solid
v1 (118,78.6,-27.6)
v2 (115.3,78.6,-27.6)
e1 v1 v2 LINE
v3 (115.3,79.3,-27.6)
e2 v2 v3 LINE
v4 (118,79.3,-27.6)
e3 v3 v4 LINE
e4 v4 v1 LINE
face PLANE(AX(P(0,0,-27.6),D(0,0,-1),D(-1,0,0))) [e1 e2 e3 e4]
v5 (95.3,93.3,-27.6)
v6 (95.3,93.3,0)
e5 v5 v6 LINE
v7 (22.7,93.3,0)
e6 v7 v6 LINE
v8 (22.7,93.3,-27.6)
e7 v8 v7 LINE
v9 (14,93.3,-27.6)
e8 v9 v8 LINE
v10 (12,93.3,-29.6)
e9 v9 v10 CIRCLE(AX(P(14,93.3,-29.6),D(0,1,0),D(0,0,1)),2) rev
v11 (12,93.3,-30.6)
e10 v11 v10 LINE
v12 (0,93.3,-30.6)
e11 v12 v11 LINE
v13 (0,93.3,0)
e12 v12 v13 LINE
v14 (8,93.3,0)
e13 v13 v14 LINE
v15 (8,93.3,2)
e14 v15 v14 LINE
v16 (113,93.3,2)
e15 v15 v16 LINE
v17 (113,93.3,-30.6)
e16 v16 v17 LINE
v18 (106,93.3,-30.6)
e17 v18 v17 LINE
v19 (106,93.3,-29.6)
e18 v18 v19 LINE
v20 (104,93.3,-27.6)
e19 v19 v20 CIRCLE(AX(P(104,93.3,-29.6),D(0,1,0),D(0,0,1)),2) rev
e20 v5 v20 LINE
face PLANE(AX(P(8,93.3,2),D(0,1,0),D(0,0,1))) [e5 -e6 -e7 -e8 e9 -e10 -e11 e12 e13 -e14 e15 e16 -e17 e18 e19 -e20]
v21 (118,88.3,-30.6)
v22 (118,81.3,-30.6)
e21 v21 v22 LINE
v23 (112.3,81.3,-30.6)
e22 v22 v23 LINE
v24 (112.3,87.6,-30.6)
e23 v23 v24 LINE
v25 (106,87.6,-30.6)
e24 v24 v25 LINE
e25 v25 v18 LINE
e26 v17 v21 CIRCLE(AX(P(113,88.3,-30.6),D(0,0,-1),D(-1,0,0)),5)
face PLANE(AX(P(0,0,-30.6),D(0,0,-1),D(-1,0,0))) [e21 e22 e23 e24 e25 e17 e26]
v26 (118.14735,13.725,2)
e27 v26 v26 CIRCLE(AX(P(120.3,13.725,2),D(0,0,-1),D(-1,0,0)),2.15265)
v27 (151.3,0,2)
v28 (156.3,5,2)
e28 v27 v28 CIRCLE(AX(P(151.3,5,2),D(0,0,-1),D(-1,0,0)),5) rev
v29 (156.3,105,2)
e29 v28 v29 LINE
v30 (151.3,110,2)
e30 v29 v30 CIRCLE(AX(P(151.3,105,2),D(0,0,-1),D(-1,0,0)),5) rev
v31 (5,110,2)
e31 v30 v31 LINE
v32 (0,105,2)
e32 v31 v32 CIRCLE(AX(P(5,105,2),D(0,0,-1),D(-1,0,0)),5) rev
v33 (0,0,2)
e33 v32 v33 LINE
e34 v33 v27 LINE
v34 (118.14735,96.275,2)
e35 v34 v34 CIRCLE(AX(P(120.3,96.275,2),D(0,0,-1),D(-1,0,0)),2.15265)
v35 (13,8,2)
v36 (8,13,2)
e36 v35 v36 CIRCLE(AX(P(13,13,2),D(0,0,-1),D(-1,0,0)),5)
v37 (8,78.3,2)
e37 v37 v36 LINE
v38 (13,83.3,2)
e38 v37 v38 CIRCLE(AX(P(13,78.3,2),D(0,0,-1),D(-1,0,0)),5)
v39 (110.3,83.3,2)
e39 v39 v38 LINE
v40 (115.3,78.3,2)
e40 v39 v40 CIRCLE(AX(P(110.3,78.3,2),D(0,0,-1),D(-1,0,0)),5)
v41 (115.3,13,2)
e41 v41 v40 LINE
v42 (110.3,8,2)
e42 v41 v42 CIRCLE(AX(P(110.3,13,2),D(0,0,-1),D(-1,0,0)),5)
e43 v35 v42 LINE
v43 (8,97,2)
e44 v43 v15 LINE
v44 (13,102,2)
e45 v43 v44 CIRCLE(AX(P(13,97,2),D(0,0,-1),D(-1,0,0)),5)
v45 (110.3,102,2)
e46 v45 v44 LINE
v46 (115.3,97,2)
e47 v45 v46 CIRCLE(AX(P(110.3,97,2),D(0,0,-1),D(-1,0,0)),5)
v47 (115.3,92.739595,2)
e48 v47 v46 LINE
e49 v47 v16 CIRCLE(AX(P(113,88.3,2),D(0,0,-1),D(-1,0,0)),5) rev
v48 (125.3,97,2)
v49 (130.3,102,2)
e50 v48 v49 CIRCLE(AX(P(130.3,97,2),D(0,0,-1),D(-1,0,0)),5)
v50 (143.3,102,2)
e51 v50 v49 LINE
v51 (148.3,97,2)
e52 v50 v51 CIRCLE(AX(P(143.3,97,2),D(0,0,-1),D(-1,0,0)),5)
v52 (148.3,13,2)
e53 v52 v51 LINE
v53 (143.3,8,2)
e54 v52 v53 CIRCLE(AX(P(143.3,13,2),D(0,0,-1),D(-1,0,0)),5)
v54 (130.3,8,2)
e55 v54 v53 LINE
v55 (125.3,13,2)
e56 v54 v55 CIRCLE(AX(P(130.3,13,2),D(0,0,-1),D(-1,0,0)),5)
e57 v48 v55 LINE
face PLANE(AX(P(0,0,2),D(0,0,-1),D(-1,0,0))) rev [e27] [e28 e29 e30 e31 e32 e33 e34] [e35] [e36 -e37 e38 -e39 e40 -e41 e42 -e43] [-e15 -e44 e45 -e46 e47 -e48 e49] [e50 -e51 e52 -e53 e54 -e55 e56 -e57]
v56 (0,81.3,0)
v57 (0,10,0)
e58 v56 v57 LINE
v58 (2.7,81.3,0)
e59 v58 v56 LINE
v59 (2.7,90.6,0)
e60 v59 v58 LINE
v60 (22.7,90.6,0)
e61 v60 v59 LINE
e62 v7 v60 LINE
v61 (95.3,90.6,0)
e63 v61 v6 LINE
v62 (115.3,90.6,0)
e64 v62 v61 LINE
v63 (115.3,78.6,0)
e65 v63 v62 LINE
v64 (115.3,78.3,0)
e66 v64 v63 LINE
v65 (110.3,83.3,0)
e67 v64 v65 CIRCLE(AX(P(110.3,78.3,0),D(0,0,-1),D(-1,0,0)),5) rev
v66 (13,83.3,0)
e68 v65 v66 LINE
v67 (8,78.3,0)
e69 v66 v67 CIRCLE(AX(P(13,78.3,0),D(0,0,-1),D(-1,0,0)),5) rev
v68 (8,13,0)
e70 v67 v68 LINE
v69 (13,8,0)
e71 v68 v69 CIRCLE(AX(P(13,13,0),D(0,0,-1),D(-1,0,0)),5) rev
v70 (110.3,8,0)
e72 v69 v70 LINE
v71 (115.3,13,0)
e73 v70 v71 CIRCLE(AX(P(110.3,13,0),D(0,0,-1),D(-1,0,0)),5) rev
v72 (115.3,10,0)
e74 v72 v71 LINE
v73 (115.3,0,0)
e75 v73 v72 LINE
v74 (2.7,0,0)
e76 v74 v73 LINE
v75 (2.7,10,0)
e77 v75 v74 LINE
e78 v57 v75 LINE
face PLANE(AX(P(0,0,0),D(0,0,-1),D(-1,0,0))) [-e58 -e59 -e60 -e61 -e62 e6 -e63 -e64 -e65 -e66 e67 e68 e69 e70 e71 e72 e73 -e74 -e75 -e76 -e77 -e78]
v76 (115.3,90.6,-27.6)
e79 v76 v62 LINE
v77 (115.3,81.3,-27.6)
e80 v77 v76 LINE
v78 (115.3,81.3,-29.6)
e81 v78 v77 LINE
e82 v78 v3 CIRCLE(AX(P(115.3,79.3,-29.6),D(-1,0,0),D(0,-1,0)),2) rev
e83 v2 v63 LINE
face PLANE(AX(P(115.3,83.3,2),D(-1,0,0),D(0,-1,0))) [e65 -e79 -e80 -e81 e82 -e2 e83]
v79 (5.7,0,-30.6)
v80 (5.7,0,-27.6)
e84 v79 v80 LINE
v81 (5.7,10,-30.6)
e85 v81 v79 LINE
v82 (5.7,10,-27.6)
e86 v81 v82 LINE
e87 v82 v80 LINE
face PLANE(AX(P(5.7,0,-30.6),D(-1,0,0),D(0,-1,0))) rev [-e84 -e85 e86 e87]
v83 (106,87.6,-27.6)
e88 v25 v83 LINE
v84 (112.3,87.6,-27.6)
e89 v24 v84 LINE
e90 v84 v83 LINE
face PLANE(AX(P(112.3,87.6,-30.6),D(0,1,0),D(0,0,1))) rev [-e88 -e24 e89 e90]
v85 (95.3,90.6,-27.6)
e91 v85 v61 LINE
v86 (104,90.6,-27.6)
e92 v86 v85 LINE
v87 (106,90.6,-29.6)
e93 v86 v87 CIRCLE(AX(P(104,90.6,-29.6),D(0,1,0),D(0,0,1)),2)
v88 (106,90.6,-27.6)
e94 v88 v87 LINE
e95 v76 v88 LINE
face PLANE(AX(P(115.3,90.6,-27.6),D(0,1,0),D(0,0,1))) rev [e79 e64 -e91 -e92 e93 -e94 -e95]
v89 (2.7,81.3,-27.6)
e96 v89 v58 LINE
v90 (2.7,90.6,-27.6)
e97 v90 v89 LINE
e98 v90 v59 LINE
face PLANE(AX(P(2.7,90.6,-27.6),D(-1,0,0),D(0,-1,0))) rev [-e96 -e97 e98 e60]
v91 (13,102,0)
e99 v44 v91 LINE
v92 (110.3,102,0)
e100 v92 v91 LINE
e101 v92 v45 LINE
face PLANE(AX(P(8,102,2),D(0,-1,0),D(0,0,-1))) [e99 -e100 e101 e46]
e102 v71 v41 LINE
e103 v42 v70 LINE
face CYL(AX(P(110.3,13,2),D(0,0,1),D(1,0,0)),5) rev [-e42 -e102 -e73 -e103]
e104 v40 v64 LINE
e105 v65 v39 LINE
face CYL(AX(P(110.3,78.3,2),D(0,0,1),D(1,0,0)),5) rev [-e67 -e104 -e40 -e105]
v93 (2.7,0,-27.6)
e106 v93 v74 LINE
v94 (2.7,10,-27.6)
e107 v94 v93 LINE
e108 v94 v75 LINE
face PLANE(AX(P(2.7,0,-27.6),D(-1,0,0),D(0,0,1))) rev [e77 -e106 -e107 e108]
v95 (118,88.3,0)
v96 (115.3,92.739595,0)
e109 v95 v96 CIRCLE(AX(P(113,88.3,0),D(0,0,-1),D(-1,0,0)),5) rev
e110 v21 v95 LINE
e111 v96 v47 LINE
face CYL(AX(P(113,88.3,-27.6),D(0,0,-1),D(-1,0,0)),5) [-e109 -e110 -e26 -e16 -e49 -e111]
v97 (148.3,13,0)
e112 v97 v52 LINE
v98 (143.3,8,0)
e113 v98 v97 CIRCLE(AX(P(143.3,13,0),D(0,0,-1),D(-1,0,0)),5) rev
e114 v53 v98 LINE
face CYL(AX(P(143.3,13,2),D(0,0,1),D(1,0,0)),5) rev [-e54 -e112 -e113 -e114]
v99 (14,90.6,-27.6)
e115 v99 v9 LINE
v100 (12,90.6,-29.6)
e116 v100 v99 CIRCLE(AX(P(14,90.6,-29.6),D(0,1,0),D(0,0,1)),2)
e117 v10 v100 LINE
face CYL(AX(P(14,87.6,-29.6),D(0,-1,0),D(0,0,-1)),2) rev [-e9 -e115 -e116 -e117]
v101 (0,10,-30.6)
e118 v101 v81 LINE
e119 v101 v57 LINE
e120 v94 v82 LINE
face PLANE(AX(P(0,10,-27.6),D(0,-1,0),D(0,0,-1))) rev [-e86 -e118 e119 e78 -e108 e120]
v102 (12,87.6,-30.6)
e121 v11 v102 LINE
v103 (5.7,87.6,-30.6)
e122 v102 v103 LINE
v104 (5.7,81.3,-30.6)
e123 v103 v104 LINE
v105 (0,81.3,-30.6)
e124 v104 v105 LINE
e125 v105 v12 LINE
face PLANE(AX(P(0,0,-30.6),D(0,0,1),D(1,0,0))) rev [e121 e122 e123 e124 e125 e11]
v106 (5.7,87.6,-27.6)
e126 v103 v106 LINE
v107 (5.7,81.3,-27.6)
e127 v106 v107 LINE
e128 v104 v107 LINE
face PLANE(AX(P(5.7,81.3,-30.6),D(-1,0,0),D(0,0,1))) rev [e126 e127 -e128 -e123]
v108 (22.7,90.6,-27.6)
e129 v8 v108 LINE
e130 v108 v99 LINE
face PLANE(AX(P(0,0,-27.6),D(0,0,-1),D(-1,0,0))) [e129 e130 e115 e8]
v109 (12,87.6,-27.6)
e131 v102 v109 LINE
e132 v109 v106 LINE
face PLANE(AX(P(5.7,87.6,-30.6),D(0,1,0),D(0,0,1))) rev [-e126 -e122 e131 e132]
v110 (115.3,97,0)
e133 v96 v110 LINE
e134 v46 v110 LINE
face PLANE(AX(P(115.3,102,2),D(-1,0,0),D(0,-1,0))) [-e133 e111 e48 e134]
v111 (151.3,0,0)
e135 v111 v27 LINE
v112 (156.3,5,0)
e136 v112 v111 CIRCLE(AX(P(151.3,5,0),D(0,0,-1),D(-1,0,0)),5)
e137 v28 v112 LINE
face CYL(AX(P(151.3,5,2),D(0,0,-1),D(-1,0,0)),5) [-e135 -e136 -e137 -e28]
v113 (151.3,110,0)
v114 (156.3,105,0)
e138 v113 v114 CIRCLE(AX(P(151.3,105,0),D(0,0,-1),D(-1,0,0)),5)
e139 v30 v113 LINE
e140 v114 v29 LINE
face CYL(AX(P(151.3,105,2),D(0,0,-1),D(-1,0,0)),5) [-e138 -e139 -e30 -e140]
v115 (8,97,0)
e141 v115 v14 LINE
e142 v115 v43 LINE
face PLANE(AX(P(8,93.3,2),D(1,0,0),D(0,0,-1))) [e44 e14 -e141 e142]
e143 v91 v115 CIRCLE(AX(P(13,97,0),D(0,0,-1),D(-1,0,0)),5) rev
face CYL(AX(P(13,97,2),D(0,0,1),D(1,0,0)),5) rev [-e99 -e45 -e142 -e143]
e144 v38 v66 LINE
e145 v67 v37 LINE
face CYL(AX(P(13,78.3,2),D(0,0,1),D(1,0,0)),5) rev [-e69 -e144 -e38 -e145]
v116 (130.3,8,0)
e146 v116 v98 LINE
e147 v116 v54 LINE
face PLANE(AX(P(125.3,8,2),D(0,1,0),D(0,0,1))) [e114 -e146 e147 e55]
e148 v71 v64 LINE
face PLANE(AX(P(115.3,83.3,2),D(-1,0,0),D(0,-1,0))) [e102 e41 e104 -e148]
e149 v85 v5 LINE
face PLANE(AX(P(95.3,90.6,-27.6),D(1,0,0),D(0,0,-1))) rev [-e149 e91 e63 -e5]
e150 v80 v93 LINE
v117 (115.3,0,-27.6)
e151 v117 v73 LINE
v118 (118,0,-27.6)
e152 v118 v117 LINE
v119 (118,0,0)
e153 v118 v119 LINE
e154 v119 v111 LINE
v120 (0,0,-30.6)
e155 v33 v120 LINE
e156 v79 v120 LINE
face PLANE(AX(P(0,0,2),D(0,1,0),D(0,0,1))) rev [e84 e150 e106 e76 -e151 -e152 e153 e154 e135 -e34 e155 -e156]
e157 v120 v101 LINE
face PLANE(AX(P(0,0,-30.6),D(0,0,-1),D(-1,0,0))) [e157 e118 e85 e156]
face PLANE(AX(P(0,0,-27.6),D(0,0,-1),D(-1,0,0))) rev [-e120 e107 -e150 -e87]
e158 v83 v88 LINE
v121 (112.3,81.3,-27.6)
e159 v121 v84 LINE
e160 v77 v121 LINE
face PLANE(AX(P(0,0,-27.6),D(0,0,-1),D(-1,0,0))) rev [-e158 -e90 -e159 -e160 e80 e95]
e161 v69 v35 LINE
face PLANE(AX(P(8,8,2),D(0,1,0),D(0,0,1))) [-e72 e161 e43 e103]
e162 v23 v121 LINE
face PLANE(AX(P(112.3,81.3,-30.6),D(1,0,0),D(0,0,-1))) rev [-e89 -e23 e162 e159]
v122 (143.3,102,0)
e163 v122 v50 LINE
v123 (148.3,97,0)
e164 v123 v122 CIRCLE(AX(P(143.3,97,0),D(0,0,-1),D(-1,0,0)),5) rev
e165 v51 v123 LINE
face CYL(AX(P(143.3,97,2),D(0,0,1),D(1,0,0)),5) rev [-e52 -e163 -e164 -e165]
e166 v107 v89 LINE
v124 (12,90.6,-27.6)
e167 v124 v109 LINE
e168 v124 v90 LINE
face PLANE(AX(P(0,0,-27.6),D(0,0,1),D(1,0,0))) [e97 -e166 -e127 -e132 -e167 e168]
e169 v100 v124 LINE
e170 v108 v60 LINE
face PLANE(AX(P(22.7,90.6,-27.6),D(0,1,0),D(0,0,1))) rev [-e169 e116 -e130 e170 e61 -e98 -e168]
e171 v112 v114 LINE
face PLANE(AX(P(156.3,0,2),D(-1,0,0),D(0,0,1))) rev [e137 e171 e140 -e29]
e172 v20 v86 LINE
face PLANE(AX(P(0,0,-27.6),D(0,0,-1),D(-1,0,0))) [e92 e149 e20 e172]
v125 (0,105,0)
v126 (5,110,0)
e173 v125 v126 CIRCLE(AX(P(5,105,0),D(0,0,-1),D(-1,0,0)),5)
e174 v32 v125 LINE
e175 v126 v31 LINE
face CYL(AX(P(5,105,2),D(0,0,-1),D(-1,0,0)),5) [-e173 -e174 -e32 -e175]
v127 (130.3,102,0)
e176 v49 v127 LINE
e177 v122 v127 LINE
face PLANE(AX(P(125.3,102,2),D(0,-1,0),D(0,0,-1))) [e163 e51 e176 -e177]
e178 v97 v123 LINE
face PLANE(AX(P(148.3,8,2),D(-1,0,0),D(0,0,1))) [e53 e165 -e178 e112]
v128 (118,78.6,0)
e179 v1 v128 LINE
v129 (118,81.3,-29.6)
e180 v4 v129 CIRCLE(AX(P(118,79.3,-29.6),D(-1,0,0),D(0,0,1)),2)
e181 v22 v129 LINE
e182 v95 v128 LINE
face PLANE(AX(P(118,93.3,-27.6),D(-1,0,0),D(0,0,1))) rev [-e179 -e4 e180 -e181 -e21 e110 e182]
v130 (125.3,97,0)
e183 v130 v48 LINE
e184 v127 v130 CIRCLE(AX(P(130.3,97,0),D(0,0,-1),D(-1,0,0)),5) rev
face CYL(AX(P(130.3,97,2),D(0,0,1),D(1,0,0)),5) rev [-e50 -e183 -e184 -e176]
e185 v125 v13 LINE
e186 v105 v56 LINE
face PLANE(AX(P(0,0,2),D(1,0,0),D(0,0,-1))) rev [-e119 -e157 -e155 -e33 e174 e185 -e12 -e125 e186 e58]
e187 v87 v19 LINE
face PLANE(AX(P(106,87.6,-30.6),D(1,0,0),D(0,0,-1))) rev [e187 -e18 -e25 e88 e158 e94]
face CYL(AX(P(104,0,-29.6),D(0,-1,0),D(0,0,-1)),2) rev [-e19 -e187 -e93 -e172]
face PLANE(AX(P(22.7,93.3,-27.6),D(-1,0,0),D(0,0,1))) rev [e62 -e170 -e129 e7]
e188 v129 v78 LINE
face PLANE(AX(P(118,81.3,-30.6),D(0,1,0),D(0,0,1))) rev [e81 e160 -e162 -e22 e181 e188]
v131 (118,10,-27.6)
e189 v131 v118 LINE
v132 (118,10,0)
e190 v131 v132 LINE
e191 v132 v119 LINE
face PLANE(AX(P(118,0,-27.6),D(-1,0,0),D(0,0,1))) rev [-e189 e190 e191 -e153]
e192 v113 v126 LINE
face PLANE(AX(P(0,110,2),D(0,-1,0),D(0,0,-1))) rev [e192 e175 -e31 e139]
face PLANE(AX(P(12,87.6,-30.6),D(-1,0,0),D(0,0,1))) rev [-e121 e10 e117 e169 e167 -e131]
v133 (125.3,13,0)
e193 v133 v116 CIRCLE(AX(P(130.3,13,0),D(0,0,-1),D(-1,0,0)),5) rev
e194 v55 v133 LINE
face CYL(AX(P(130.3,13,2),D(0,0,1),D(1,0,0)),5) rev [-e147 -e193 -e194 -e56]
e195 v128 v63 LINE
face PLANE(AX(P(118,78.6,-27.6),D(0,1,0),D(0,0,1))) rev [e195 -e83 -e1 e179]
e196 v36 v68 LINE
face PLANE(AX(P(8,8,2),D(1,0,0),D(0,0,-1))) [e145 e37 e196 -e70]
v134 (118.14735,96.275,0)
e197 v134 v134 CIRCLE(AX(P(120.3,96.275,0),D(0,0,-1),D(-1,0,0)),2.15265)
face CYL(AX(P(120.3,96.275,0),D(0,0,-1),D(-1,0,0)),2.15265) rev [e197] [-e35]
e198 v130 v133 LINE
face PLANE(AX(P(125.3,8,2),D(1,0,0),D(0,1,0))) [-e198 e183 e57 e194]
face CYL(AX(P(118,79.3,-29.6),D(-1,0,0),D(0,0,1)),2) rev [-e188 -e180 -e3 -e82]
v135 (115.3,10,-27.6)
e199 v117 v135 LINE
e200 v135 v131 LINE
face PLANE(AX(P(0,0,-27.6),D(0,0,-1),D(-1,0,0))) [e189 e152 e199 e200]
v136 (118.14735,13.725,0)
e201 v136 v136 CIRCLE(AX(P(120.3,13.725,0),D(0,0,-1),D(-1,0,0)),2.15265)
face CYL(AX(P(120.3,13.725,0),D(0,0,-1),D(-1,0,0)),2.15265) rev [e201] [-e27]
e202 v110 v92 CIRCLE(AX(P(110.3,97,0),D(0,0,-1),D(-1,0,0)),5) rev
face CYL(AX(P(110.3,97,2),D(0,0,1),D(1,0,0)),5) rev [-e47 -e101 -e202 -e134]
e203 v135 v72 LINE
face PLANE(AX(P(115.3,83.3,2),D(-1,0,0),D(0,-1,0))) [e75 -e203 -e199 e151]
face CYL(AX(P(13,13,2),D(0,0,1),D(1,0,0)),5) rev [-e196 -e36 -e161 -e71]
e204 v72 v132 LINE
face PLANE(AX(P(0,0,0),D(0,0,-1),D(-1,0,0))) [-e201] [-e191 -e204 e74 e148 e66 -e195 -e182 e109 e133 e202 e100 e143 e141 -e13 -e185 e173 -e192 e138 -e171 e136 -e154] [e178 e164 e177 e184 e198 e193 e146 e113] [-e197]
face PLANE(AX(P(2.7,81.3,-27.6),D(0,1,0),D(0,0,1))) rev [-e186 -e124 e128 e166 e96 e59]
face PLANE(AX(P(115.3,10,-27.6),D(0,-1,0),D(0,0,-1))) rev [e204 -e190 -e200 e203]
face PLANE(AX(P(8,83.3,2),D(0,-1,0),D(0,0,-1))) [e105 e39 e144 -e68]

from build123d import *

# Parameters (mm, degrees)
SKETCH1_W             = 156.3
SKETCH1_H             = 110
SKETCH1_W_2           = 107.3
SKETCH1_H_2           = 75.3
SKETCH1_H_3           = 8.7
SKETCH1_W_3           = 23
SKETCH1_H_4           = 94
BOSS_EXTRUDE1_DEPTH   = 2
F_6_CLEARANCE_HOLE1_D = 4.3053
SKETCH6_W             = 2.7
SKETCH6_H             = 10
BOSS_EXTRUDE2_DEPTH   = 27.6
SKETCH7_W             = 5.7
SKETCH7_H             = 10
BOSS_EXTRUDE3_DEPTH   = 3
FILLET3_R             = 5
FILLET4_R             = 2
FILLET5_R             = 5


with BuildPart() as part:
    # Sketch1 → Boss-Extrude1 (new body)
    with BuildSketch(Plane.XY):
        with Locations((78.15, 55)):
            Rectangle(SKETCH1_W, SKETCH1_H)
        with Locations((61.65, 45.65)):
            Rectangle(SKETCH1_W_2, SKETCH1_H_2, mode=Mode.SUBTRACT)
        with Locations((61.65, 97.65)):
            Rectangle(SKETCH1_W_2, SKETCH1_H_3, mode=Mode.SUBTRACT)
        with Locations((136.8, 55)):
            Rectangle(SKETCH1_W_3, SKETCH1_H_4, mode=Mode.SUBTRACT)
    extrude(amount=BOSS_EXTRUDE1_DEPTH)

    # #6 Clearance Hole1 (through all)
    with Locations(Plane(origin=(0, 0, 0), x_dir=(-1, 0, 0), z_dir=(0, 0, -1))):
        with Locations((-120.3, 13.725), (-120.3, 96.275)):
            Hole(F_6_CLEARANCE_HOLE1_D / 2)

    # Sketch6 → Boss-Extrude2 (add)
    with BuildSketch(Plane(origin=(0, 0, 0), x_dir=(-1, 0, 0), z_dir=(0, 0, -1))):
        with Locations((-1.35, 5)):
            Rectangle(SKETCH6_W, SKETCH6_H)
        with Locations((-116.65, 5)):
            Rectangle(SKETCH6_W, SKETCH6_H)
        Polygon((0, 81.3), (0, 93.3), (-22.7, 93.3), (-22.7, 90.6), (-2.7, 90.6), (-2.7, 81.3), align=None)
        Polygon((-95.3, 93.3), (-118, 93.3), (-118, 78.6), (-115.3, 78.6), (-115.3, 90.6), (-95.3, 90.6), align=None)
    extrude(amount=BOSS_EXTRUDE2_DEPTH)

    # Sketch7 → Boss-Extrude3 (add)
    with BuildSketch(Plane(origin=(0, 0, -27.6), x_dir=(-1, 0, 0), z_dir=(0, 0, -1))):
        Polygon((0, 93.3), (0, 81.3), (-5.7, 81.3), (-5.7, 87.6), (-12, 87.6), (-12, 93.3), align=None)
        with Locations((-2.85, 5)):
            Rectangle(SKETCH7_W, SKETCH7_H)
        Polygon((-118, 93.3), (-118, 81.3), (-112.3, 81.3), (-112.3, 87.6), (-106, 87.6), (-106, 93.3), align=None)
    extrude(amount=BOSS_EXTRUDE3_DEPTH)

    # Fillet3
    fillet3_edges = [part.edges().sort_by_distance(p)[0] for p in [
        (118, 93.3, -15.3),
    ]]
    fillet(fillet3_edges, radius=FILLET3_R)

    # Fillet4
    fillet4_edges = [part.edges().sort_by_distance(p)[0] for p in [
        (12, 91.95, -27.6),
        (106, 91.95, -27.6),
        (116.65, 81.3, -27.6),
    ]]
    fillet(fillet4_edges, radius=FILLET4_R)

    # Fillet5
    # the kernel refuses this fillet: 5 mm, written as the material it adds along each edge
    with BuildSketch(Plane(origin=(8, 83.3, 0), x_dir=(1, 0, 0), z_dir=(0, 0, 1)), Plane(origin=(115.3, 83.3, 0), x_dir=(0, -1, 0), z_dir=(0, 0, 1)), Plane(origin=(148.3, 102, 0), x_dir=(0, -1, 0), z_dir=(0, 0, 1)), Plane(origin=(148.3, 8, 0), x_dir=(-1, 0, 0), z_dir=(0, 0, 1)), Plane(origin=(8, 102, 0), x_dir=(1, 0, 0), z_dir=(0, 0, 1)), Plane(origin=(115.3, 102, 0), x_dir=(0, -1, 0), z_dir=(0, 0, 1))) as fillet5_piece_1:
        with BuildLine():
            CenterArc((FILLET5_R, -FILLET5_R), FILLET5_R, 90, 90)
            Line((0, -FILLET5_R), (0, 0))
            Line((0, 0), (FILLET5_R, 0))
        make_face()
    extrude(amount=2)
    with BuildSketch(Plane(origin=(8, 8, 0), x_dir=(1, 0, 0), z_dir=(0, 0, 1)), Plane(origin=(115.3, 8, 0), x_dir=(0, 1, 0), z_dir=(0, 0, 1)), Plane(origin=(125.3, 102, 0), x_dir=(0, -1, 0), z_dir=(0, 0, 1)), Plane(origin=(125.3, 8, 0), x_dir=(1, 0, 0), z_dir=(0, 0, 1))) as fillet5_piece_2:
        with BuildLine():
            CenterArc((FILLET5_R, FILLET5_R), FILLET5_R, 180, 90)
            Line((0, FILLET5_R), (0, 0))
            Line((0, 0), (FILLET5_R, 0))
        make_face()
    extrude(amount=2)
    # the kernel refuses this fillet: 5 mm, written as the material it takes off along each edge
    with BuildSketch(Plane(origin=(0, 110, -12.5), x_dir=(1, 0, 0), z_dir=(0, 0, 1))) as fillet5_2_piece_1:
        with BuildLine():
            CenterArc((FILLET5_R, -FILLET5_R), FILLET5_R, 90, 90)
            Line((0, -FILLET5_R), (0, 0))
            Line((0, 0), (FILLET5_R, 0))
        make_face()
    extrude(amount=27, mode=Mode.SUBTRACT)
    with BuildSketch(Plane(origin=(156.3, 110, -12.5), x_dir=(-1, 0, 0), z_dir=(0, 0, 1)), Plane(origin=(156.3, 0, -12.5), x_dir=(0, 1, 0), z_dir=(0, 0, 1))) as fillet5_2_piece_2:
        with BuildLine():
            CenterArc((FILLET5_R, FILLET5_R), FILLET5_R, 180, 90)
            Line((0, FILLET5_R), (0, 0))
            Line((0, 0), (FILLET5_R, 0))
        make_face()
    extrude(amount=27, mode=Mode.SUBTRACT)


solid = part.part
